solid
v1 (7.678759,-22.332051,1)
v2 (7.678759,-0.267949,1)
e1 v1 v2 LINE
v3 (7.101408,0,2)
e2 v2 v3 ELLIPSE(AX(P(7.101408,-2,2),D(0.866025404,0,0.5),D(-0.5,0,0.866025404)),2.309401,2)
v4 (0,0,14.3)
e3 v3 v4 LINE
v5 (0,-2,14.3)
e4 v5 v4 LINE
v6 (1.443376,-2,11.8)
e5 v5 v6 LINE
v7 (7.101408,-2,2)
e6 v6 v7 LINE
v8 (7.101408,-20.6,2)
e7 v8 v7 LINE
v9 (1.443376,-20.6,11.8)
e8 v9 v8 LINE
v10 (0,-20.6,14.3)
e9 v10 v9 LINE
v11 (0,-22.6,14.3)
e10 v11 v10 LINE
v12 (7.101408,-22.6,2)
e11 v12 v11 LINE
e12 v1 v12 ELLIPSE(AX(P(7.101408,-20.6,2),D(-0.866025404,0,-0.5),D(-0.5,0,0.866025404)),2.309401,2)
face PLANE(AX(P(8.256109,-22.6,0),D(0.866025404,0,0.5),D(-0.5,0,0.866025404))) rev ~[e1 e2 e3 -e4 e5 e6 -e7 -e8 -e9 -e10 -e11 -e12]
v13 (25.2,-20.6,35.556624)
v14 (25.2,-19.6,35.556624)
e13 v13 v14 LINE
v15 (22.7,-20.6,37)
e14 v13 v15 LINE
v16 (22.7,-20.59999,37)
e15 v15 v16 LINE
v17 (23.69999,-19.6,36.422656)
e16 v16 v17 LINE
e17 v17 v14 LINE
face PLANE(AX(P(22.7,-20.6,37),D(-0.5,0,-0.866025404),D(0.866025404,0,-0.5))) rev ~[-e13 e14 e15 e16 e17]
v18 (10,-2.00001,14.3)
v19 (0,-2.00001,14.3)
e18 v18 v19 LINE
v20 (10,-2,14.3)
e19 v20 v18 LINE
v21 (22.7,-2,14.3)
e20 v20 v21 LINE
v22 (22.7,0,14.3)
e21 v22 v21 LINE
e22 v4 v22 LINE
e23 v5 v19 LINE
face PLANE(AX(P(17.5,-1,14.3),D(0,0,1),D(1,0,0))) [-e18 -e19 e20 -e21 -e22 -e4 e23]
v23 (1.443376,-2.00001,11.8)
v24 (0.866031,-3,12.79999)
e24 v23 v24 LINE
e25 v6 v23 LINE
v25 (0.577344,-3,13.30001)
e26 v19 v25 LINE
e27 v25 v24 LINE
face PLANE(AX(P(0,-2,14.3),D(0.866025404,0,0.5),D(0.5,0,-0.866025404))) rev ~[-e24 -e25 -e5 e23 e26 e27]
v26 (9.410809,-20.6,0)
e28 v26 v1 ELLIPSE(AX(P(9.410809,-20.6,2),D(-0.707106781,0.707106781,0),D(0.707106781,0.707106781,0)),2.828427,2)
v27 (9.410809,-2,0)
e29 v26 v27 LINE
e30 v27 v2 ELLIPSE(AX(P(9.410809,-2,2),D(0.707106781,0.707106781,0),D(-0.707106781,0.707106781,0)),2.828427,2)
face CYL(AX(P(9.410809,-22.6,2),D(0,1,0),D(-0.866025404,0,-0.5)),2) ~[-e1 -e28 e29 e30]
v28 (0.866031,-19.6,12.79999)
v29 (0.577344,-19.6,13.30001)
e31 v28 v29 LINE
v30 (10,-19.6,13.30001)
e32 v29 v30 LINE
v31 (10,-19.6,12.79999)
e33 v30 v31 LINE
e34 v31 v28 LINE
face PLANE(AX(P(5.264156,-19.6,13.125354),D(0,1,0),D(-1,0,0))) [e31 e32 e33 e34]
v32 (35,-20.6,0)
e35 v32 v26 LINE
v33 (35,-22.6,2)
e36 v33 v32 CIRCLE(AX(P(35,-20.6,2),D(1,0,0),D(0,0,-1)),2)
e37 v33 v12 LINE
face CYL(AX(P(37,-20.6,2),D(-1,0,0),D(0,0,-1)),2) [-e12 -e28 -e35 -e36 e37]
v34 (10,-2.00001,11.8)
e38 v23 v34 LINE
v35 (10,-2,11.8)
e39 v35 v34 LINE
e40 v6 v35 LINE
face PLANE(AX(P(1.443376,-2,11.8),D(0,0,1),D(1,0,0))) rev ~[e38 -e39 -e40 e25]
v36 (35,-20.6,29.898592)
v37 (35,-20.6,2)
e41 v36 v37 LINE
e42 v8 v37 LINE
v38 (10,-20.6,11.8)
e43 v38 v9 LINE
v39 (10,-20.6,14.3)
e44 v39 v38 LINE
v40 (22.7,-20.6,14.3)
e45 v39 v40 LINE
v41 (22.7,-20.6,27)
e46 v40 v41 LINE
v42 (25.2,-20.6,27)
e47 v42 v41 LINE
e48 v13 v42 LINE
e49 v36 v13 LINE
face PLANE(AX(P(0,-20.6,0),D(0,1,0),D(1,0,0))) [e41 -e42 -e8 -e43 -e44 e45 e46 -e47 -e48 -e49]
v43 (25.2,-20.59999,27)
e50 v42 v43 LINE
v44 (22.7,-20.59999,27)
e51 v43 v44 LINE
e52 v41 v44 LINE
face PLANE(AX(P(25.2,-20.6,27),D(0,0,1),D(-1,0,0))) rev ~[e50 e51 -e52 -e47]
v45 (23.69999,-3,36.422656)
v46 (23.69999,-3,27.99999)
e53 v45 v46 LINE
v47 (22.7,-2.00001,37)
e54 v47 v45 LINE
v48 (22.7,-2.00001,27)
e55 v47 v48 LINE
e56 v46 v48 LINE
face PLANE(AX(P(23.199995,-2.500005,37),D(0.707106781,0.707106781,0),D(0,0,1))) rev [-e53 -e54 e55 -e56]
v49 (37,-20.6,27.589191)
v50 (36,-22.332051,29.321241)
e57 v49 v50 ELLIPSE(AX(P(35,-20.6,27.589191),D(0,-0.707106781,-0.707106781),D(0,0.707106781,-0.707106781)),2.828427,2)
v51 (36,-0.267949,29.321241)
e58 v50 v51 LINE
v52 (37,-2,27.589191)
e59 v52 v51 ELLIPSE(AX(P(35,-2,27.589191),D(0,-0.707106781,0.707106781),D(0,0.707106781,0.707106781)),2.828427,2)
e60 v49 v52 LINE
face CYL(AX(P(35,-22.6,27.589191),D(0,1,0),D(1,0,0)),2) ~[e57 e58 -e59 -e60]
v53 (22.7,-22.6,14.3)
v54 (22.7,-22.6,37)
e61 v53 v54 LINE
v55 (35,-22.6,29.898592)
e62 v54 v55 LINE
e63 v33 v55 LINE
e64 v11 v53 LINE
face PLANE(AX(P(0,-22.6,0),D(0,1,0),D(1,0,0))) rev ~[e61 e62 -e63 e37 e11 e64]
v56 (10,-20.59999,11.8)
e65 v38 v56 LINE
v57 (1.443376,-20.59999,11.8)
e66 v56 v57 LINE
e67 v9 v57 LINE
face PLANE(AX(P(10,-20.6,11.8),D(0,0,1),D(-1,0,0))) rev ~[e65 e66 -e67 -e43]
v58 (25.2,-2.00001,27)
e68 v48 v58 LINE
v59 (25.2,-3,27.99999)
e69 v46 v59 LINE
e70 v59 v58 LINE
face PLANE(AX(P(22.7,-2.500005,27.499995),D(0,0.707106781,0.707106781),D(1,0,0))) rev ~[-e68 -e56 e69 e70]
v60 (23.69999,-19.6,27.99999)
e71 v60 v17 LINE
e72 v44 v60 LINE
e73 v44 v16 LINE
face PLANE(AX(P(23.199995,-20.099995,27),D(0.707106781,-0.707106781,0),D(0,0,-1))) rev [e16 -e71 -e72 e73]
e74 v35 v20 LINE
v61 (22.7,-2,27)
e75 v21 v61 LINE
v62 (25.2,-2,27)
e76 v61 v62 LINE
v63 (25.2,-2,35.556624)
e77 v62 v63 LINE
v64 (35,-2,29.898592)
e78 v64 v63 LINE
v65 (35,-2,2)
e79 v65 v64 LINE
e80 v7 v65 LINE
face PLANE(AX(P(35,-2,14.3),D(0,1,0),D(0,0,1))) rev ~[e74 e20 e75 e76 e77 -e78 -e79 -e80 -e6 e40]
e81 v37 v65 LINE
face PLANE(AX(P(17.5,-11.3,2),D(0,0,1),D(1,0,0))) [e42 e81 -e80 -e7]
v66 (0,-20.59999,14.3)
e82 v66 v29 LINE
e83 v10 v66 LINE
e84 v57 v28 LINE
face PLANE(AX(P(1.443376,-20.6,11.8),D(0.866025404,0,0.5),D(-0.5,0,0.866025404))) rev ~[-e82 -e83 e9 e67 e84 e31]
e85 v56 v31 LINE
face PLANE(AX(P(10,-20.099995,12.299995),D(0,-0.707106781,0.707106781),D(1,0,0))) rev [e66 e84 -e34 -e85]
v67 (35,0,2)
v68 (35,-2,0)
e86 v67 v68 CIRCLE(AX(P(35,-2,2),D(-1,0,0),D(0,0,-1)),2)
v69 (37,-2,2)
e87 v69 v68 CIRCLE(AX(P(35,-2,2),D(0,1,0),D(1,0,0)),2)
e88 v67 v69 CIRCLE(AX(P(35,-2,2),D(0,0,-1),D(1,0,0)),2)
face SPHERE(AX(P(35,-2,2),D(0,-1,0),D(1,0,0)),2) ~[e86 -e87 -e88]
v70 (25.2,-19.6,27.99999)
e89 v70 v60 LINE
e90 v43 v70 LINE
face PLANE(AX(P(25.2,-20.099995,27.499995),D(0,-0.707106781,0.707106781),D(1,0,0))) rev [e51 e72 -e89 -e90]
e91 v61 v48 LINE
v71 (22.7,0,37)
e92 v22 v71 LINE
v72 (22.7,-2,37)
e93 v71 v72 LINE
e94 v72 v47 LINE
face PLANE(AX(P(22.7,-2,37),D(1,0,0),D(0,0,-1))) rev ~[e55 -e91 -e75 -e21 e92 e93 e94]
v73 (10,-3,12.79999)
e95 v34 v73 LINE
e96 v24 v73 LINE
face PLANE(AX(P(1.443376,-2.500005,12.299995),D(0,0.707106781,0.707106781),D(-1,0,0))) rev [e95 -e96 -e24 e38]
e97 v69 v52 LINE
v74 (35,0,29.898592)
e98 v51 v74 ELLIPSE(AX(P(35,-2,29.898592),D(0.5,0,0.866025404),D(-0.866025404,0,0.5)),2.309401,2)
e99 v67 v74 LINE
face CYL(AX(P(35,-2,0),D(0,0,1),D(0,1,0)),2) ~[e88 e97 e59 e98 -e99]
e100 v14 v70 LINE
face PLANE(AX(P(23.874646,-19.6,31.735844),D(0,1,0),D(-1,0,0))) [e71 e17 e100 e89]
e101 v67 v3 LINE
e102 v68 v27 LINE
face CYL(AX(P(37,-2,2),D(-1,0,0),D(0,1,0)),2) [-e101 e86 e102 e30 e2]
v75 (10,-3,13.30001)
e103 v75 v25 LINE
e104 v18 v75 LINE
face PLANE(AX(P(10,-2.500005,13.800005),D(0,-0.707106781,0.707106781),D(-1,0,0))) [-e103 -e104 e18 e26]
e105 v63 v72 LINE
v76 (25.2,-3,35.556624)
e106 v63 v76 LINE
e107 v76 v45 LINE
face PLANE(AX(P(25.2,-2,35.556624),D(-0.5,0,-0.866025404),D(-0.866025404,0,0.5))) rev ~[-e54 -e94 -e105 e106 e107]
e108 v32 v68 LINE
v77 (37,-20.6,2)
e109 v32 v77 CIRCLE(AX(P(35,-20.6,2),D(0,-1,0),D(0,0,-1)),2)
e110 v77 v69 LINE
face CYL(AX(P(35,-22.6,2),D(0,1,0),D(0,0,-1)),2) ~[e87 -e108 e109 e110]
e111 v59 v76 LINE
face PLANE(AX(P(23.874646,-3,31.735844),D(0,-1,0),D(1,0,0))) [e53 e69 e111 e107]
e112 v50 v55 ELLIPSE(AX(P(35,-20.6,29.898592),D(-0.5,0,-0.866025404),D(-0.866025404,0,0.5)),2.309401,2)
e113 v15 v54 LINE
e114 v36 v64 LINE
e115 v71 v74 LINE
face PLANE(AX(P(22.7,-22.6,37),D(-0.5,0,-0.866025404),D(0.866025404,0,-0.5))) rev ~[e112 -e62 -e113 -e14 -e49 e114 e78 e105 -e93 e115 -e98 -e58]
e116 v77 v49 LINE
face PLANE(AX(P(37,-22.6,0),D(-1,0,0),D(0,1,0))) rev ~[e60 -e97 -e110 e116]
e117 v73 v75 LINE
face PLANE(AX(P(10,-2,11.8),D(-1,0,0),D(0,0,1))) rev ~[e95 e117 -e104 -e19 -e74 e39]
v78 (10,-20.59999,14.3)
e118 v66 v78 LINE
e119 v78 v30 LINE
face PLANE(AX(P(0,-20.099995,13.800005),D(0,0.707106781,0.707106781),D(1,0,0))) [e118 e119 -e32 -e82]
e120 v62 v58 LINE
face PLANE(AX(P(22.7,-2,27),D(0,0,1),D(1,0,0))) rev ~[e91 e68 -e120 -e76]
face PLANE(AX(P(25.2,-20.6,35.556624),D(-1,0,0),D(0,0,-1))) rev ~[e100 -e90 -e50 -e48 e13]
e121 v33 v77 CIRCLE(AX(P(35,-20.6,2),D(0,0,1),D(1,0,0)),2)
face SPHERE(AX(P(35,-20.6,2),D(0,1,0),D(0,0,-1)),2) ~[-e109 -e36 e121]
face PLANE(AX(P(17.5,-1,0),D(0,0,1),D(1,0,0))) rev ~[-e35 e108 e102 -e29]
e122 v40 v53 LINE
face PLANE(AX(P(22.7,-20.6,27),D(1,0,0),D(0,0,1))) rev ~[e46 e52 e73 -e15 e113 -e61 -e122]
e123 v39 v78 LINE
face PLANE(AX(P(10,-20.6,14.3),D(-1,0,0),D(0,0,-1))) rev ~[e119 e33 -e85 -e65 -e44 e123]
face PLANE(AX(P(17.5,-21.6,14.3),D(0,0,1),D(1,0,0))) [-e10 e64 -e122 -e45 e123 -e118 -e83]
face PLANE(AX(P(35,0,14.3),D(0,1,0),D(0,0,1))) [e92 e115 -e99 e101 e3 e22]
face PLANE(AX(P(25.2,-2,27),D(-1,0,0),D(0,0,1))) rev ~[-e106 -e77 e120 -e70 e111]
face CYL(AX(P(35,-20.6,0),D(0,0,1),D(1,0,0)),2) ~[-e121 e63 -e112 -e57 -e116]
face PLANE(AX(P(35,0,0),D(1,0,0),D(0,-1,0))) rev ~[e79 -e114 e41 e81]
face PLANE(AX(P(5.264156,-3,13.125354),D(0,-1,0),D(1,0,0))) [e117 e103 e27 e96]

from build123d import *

# Parameters (mm, degrees)
F4_W      = 35
F4_H      = 18.6
F5_DEPTH  = 2
F4_W_2    = 2
F4_H_2    = 2
F6_DEPTH  = 37
F7_DEPTH  = 14.3
F8_W      = 2
F8_H      = 22.7
F9_DEPTH  = 12.3
F11_DEPTH = 22.6
F12_R     = 2
F14_DEPTH = 1
F15_SIZE  = 0.99999
F17_DEPTH = 1
F18_SIZE  = 0.99999


# Not quite as in the source:
# - a fillet or chamfer is up to 0.001 mm smaller than in the source, because OpenCascade refuses the exact size


with BuildPart() as f5:
    # F4 (on Top) → F5 (new body)
    with BuildSketch(Plane.XY):
        with Locations((17.5, -11.3)):
            Rectangle(F4_W, F4_H)
    extrude(amount=F5_DEPTH)

    # F4 (on Top) → F6 (join)
    with BuildSketch(Plane.XY):
        with Locations((36, -11.3)):
            Rectangle(F4_W_2, F4_H)
        with Locations((36, -21.6)):
            Rectangle(F4_W_2, F4_H_2)
        with Locations((36, -1)):
            Rectangle(F4_W_2, F4_H_2)
    extrude(amount=F6_DEPTH)

    # F4 (on Top) → F7 (join)
    with BuildSketch(Plane.XY):
        with Locations((17.5, -1)):
            Rectangle(F4_W, F4_H_2)
        with Locations((17.5, -21.6)):
            Rectangle(F4_W, F4_H_2)
    extrude(amount=F7_DEPTH)

    # F8 (on face) → F9 (join)
    with BuildSketch(Plane(origin=(35, 0, 0), x_dir=(0, -1, 0), z_dir=(-1, 0, 0))):
        with Locations((1, 25.65)):
            Rectangle(F8_W, F8_H)
        with Locations((21.6, 25.65)):
            Rectangle(F8_W, F8_H)
    extrude(amount=F9_DEPTH)

    # F10 (on face) → F11 (cut)
    with BuildSketch(Plane.XZ.offset(22.6)):
        Polygon((8.2561088494, 0), (0, 14.3), (0, 0), align=None)
        Polygon((37, 37), (22.7, 37), (37, 28.7438911506), align=None)
    extrude(amount=-F11_DEPTH, mode=Mode.SUBTRACT)

    # F12
    f12_edges = [f5.edges().sort_by_distance(p)[0] for p in [
        (37, -11.3, 0),
        (22.628054, -22.6, 0),
        (37, -22.6, 14.371946),
        (37, 0, 14.371946),
        (22.628054, 0, 0),
        (8.256109, -11.3, 0),
        (37, -11.3, 28.743891),
    ]]
    fillet(f12_edges, radius=F12_R)

    # F13 (on face) → F14 (join)
    with BuildSketch(Plane.XZ.offset(2)):
        Polygon((25.2, 35.556624327), (22.7, 37), (22.7, 27), (25.2, 27), align=None)
        Polygon((10, 11.8), (10, 14.3), (0, 14.3), (1.443375673, 11.8), align=None)
    extrude(amount=F14_DEPTH)

    # F15 (size 1 in the source; OpenCascade refuses exactly that, so slightly less here)
    f15_edges = [f5.edges().sort_by_distance(p)[0] for p in [
        (23.95, -3, 27),
        (5.721688, -3, 11.8),
        (22.7, -3, 32),
        (5, -3, 14.3),
    ]]
    chamfer(f15_edges, length=F15_SIZE)

    # F16 (on face) → F17 (join)
    with BuildSketch(Plane(origin=(0, -20.6, 0), x_dir=(-1, 0, 0), z_dir=(0, 1, 0))):
        Polygon((-22.7, 27), (-22.7, 37), (-25.2, 35.556624327), (-25.2, 27), align=None)
        Polygon((0, 14.3), (-10, 14.3), (-10, 11.8), (-1.443375673, 11.8), align=None)
    extrude(amount=F17_DEPTH)

    # F18 (size 1 in the source; OpenCascade refuses exactly that, so slightly less here)
    f18_edges = [f5.edges().sort_by_distance(p)[0] for p in [
        (5.721688, -19.6, 11.8),
        (5, -19.6, 14.3),
        (22.7, -19.6, 32),
        (23.95, -19.6, 27),
    ]]
    chamfer(f18_edges, length=F18_SIZE)


solid = f5.part
